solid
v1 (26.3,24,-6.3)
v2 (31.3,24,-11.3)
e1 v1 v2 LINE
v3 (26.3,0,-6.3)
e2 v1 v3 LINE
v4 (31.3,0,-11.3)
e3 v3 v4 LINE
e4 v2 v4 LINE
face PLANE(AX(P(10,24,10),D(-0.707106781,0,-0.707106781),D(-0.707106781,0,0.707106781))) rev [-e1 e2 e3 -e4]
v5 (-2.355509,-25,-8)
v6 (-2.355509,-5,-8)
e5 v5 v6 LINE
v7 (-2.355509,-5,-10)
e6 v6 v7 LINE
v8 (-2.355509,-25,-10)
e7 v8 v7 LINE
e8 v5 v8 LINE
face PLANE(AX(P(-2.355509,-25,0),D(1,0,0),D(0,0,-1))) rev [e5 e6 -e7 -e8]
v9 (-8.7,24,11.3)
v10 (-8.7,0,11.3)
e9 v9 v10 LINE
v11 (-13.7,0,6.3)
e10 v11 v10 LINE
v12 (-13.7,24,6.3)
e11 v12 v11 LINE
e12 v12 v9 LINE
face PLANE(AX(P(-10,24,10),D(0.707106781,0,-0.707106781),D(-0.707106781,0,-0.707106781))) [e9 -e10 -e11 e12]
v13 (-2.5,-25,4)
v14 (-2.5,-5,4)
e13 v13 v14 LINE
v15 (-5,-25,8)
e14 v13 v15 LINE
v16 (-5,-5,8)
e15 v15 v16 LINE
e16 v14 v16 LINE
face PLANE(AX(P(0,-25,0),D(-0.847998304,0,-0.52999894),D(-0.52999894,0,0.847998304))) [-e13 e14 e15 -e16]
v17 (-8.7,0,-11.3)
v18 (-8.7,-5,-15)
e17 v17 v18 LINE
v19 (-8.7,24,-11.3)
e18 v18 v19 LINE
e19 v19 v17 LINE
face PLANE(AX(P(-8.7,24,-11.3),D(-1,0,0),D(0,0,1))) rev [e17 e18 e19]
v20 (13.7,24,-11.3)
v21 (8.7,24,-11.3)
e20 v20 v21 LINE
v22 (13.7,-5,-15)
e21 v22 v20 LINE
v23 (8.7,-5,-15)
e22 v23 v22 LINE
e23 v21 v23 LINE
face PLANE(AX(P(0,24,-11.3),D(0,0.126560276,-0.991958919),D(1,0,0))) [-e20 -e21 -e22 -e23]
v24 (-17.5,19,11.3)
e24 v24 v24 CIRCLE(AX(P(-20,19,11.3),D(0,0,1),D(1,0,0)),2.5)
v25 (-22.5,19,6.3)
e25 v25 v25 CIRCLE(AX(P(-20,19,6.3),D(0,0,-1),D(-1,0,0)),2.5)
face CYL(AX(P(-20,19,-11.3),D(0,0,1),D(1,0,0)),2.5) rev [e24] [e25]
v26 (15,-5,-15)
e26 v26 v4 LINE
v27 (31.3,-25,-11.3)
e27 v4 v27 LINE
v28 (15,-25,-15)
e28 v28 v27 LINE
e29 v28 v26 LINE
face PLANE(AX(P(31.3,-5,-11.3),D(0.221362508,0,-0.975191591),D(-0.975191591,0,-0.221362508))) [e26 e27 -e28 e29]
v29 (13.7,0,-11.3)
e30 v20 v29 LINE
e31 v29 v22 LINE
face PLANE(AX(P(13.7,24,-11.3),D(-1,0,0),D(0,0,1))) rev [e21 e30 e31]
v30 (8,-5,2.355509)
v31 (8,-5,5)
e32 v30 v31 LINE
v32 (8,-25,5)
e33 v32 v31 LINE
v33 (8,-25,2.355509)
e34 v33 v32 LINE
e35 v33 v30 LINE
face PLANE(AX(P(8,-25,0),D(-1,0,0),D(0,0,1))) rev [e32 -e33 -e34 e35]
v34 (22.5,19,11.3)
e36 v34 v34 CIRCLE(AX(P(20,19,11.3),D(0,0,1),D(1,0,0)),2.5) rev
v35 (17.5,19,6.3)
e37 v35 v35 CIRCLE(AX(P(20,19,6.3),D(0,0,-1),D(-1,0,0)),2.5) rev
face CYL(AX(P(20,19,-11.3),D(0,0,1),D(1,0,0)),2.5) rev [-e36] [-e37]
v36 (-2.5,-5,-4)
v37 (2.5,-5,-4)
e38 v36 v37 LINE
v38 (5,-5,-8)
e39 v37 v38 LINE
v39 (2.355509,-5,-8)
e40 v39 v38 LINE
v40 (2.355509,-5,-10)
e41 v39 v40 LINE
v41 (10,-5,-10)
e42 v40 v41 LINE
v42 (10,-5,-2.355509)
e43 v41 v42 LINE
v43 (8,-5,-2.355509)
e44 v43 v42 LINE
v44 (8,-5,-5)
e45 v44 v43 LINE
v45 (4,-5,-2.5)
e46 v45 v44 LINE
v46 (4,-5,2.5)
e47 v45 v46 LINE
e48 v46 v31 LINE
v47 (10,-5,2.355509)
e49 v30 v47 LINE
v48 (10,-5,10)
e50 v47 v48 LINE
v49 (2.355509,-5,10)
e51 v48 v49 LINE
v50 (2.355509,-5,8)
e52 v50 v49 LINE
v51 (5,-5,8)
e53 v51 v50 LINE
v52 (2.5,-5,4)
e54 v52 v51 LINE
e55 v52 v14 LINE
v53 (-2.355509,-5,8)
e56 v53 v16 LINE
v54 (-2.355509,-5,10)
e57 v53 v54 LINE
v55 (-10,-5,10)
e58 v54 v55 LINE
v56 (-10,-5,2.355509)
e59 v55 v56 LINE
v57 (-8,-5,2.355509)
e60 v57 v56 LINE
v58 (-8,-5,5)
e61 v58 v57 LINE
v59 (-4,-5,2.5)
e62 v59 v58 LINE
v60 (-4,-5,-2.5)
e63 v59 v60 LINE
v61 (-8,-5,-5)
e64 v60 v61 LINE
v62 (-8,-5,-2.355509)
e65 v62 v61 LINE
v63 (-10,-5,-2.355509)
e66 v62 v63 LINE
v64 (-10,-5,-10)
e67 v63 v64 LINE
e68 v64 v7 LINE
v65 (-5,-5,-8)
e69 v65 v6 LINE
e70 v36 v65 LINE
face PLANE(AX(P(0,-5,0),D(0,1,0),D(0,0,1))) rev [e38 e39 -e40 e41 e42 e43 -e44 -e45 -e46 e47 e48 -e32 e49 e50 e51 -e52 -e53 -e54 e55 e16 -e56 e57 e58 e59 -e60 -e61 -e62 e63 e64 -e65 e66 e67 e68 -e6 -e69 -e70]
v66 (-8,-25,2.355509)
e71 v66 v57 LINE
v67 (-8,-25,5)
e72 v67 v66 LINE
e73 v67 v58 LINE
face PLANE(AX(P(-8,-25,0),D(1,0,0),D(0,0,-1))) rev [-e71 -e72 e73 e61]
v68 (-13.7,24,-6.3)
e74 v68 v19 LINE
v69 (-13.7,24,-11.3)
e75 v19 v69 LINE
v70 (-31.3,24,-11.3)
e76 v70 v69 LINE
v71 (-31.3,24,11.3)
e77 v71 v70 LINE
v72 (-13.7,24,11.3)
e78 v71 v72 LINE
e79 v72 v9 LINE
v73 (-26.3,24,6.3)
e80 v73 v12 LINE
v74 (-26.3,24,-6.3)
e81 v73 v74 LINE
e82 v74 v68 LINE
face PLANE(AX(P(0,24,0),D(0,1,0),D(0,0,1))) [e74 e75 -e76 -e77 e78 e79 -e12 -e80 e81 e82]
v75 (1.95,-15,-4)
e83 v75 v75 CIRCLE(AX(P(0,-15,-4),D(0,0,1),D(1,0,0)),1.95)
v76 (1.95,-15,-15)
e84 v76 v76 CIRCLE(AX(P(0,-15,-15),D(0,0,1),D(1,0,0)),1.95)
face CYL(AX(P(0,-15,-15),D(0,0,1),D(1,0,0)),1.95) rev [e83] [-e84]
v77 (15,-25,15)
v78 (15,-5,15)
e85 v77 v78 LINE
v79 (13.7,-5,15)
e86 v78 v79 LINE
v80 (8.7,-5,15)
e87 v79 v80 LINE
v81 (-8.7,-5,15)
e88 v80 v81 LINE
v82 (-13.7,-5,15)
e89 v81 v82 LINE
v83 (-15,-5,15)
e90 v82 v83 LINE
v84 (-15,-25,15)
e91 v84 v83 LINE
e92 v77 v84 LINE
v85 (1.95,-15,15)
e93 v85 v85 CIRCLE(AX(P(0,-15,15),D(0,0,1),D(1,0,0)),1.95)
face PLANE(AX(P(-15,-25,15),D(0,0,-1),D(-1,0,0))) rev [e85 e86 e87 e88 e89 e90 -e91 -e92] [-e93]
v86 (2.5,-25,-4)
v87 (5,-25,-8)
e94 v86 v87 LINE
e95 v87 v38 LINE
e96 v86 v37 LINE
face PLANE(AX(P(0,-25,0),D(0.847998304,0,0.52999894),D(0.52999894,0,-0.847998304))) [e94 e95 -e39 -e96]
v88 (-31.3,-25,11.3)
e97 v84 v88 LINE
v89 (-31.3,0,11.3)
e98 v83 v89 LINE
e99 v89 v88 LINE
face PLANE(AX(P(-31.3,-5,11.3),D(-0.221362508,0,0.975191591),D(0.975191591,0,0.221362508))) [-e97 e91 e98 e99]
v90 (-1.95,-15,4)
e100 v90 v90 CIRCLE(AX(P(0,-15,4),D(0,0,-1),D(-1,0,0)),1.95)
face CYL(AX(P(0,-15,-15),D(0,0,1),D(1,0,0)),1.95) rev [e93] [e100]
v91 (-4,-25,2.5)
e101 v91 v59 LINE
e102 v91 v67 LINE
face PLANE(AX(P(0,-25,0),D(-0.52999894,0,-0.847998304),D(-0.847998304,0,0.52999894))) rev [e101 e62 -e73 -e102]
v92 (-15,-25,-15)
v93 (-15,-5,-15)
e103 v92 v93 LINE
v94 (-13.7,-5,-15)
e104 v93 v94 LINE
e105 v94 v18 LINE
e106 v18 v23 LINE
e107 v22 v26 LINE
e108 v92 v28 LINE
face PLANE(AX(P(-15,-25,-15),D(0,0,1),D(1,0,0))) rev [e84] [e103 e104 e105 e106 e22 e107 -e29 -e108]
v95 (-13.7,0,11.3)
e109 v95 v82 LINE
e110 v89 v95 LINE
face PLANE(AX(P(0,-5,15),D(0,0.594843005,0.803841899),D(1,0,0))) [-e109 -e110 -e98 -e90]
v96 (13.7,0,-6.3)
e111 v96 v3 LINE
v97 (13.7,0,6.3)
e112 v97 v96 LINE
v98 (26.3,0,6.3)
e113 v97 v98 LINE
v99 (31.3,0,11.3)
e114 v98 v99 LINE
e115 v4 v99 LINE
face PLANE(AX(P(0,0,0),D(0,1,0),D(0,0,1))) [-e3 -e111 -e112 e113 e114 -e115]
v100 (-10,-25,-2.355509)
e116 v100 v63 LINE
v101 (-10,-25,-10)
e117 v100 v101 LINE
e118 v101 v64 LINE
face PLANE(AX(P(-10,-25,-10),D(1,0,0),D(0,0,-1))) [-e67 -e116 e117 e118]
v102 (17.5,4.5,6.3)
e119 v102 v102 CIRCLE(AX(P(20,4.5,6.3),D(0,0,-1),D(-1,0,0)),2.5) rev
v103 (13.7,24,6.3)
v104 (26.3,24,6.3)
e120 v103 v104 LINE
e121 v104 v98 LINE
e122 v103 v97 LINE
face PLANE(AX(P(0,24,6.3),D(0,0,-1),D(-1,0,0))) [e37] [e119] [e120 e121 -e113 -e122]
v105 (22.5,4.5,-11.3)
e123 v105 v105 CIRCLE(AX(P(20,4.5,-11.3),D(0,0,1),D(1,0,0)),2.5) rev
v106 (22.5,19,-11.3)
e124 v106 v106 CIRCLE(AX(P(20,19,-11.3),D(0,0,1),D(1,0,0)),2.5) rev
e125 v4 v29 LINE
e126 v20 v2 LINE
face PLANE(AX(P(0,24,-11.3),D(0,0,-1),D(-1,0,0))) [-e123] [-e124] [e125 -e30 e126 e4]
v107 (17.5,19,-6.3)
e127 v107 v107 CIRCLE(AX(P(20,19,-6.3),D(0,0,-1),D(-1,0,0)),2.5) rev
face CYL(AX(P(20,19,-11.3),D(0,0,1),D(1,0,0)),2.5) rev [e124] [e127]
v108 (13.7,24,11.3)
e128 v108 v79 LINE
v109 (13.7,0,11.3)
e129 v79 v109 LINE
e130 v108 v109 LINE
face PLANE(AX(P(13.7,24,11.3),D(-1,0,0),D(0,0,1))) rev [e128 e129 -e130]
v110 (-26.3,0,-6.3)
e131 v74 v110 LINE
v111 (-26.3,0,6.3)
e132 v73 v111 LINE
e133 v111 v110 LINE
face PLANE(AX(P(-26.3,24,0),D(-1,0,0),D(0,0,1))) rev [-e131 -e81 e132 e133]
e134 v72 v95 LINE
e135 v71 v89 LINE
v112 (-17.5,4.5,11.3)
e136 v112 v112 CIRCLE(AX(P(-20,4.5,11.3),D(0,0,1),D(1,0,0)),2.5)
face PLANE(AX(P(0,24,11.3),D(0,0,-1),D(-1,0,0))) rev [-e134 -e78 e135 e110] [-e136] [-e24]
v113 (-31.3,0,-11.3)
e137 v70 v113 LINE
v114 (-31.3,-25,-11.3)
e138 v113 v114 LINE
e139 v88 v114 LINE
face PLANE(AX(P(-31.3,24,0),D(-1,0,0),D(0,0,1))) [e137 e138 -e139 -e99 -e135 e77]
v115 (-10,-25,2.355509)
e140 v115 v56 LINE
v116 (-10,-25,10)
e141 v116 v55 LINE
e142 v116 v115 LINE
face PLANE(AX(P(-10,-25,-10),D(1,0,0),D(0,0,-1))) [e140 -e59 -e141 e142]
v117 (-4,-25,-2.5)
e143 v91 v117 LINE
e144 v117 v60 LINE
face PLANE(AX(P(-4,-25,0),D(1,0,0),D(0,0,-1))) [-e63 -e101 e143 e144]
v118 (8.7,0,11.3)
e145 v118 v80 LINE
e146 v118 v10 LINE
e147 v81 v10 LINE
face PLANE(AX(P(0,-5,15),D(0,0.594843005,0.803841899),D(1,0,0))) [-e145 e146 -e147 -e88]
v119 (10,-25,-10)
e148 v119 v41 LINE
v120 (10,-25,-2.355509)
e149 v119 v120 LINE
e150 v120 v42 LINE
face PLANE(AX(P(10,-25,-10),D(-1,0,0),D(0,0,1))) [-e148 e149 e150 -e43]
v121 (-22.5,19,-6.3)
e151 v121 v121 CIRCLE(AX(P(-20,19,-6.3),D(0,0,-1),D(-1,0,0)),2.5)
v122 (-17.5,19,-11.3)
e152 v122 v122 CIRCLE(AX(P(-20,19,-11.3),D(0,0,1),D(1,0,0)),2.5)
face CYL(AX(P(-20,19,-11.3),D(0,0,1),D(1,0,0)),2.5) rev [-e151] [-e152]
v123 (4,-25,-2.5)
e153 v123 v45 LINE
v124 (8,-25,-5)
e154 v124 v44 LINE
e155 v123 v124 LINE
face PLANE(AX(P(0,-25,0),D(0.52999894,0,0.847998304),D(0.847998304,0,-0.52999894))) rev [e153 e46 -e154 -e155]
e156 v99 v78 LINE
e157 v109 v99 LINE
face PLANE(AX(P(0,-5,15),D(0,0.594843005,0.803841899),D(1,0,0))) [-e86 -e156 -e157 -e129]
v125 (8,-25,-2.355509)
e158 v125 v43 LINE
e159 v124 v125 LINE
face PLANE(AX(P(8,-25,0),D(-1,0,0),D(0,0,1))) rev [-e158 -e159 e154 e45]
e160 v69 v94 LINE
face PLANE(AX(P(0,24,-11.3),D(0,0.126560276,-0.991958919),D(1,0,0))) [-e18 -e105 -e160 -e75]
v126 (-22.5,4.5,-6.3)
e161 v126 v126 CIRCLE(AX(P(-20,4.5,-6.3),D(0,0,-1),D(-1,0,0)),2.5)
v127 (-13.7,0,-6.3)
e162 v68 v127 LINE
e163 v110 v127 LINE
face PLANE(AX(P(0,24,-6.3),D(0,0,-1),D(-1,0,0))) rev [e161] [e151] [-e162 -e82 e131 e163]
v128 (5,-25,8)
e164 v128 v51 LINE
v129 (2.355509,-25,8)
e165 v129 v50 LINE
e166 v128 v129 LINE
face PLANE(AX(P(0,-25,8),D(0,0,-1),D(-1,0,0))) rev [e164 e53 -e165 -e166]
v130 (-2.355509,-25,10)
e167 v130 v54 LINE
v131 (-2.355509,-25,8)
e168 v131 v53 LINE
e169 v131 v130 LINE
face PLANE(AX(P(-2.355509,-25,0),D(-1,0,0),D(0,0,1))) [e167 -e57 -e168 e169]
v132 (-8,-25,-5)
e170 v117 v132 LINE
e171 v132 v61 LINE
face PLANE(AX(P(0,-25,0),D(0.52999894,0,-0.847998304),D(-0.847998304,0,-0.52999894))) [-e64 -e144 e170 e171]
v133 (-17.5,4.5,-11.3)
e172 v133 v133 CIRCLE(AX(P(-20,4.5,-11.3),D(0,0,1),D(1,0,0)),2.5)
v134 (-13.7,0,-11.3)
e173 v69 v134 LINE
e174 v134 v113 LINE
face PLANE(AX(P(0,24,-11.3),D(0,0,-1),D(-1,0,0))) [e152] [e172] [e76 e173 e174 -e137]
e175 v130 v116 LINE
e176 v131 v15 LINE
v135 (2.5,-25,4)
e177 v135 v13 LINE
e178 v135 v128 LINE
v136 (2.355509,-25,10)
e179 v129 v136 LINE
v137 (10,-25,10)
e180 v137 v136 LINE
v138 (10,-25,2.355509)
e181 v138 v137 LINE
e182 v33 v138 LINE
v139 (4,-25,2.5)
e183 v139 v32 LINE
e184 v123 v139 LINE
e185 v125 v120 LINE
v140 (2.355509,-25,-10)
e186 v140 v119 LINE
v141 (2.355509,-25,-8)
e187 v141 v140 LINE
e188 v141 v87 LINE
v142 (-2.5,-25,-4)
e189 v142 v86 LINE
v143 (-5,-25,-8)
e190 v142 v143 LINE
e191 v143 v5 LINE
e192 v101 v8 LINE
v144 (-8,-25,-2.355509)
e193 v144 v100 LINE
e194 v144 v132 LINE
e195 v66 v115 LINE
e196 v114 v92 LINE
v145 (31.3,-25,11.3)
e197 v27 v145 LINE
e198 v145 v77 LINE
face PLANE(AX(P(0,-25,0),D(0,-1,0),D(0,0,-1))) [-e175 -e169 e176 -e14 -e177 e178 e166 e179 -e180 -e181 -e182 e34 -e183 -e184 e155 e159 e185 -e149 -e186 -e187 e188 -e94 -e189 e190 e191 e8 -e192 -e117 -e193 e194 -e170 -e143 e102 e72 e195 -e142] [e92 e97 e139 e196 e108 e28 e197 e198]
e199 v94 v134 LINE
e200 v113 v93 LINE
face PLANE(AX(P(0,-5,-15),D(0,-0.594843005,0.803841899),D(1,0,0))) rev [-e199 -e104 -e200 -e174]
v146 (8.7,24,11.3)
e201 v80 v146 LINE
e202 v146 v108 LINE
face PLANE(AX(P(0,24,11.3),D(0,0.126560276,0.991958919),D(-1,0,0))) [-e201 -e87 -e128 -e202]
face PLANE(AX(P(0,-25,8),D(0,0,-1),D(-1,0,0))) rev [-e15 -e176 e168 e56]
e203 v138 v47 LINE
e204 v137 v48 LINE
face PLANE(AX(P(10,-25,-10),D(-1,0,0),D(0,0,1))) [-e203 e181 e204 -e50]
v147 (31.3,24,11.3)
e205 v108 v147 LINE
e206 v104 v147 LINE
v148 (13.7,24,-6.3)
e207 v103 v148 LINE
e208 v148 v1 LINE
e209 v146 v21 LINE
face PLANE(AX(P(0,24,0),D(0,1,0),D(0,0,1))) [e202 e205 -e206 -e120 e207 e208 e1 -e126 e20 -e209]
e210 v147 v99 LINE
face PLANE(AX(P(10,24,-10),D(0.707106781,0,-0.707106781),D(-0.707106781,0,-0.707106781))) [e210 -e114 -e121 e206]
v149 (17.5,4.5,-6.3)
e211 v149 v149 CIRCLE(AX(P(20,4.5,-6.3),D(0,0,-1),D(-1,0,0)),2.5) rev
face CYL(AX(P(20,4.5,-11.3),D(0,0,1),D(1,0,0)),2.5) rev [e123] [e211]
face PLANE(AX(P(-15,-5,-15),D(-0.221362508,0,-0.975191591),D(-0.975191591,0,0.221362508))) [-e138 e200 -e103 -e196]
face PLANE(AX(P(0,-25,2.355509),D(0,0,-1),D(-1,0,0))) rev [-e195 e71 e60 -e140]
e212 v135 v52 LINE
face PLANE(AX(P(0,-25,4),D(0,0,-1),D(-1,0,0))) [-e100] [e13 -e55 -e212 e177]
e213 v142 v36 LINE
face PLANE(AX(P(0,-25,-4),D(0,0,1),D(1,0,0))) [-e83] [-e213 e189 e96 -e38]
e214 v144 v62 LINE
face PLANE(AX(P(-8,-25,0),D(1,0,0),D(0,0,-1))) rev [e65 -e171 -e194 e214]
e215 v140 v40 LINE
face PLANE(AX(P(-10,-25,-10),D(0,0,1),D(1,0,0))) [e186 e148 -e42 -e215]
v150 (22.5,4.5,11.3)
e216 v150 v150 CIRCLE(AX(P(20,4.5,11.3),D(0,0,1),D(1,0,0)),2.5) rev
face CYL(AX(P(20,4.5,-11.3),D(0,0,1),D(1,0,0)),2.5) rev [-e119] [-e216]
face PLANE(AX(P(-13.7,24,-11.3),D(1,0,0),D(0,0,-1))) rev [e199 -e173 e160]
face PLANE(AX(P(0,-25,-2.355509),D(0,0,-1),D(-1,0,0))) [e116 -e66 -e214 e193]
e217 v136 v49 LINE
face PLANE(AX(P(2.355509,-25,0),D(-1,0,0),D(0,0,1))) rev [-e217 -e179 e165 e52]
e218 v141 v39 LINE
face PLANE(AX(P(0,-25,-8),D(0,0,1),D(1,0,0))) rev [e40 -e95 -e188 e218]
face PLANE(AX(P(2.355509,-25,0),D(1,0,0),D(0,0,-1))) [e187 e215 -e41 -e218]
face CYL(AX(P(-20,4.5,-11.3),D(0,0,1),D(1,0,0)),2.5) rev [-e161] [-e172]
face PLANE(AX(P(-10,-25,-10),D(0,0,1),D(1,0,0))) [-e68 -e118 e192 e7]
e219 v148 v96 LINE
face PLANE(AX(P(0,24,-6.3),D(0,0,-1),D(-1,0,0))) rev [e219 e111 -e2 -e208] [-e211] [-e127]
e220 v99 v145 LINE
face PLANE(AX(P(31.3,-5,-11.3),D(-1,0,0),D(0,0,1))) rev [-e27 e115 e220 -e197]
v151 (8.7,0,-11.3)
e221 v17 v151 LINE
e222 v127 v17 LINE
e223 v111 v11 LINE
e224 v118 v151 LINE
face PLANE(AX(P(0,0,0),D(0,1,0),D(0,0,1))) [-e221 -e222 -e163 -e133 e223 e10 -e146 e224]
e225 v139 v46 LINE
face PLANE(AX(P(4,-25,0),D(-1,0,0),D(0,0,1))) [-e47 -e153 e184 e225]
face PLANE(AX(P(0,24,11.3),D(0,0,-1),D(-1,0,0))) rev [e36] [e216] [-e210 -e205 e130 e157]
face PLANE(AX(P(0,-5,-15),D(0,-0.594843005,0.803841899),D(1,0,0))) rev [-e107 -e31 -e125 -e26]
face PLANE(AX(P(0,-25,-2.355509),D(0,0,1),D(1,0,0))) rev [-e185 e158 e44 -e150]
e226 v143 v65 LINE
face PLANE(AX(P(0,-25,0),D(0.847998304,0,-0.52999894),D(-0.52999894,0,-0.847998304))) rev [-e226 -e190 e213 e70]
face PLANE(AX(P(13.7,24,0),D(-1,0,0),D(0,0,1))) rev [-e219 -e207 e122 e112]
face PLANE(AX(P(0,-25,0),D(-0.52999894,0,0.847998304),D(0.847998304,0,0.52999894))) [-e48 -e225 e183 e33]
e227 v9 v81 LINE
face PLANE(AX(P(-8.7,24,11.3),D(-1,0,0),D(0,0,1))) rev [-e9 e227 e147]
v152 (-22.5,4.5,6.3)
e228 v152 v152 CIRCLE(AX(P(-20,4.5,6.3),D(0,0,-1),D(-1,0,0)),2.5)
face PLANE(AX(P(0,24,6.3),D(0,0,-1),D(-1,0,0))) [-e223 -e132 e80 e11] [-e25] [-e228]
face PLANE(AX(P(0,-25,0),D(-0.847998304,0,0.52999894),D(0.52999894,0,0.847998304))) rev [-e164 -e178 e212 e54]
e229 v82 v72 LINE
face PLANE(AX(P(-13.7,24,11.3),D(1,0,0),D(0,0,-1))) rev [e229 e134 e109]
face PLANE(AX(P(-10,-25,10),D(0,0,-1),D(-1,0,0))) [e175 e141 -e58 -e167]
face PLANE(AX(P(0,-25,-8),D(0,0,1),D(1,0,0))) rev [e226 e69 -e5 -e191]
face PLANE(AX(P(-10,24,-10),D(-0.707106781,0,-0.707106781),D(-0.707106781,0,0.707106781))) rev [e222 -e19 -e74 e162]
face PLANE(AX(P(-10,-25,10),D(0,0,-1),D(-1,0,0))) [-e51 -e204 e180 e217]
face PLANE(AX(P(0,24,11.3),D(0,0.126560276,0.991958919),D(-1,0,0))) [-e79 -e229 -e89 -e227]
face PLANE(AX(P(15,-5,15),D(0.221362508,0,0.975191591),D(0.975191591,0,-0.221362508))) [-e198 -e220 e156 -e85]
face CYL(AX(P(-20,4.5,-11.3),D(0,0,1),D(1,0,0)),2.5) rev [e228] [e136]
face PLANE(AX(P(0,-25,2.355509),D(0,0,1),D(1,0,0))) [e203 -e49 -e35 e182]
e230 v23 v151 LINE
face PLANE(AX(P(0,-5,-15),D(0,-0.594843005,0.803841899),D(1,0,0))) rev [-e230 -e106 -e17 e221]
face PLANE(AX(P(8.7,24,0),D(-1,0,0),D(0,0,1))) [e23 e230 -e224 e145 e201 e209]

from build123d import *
from OCP.BRepFilletAPI import BRepFilletAPI_MakeChamfer

# Parameters (mm, degrees)
BOSS_EXTRUDE1_DEPTH     = 24
SKETCH2_R               = 2.5
CUT_EXTRUDE1_DEPTH      = 46.458222579
SKETCH3_W               = 62.6
SKETCH3_H               = 22.6
BOSS_EXTRUDE2_DEPTH     = 5
SKETCH4_W               = 30
SKETCH4_H               = 30
SKETCH4_W_2             = 20
SKETCH4_H_2             = 20
BOSS_EXTRUDE3_DEPTH     = 20
SKETCH6_W               = 20
SKETCH6_H               = 20
BOSS_EXTRUDE4_DEPTH     = 20
SKETCH8_W               = 2
SKETCH8_H               = 4.711017494
SKETCH8_W_2             = 4.711017494
SKETCH8_H_2             = 2
BOSS_EXTRUDE5_DEPTH     = 20
SKETCH9_W               = 5
SKETCH9_H               = 3.7
BOSS_EXTRUDE6_DEPTH     = 29
CHAMFER1_SIZE           = 29
CHAMFER1_SIZE2          = 3.7
CHAMFER3_SIZE           = 3.7
CHAMFER3_SIZE_2         = 5
CHAMFER4_SIZE           = 5
CHAMFER4_SIZE_2         = 3.7
CHAMFER5_SIZE2          = 3.7
CHAMFER5_SIZE           = 5
CUT_EXTRUDE2_DEPTH      = 45.33610267
CUT_EXTRUDE2_DEPTH_BACK = 45.33610267
SKETCH11_R              = 1.95


# Some blends are built 0.0001 mm under size
with BuildPart() as part:
    # Sketch1 → Boss-Extrude1 (new body)
    with BuildSketch(Plane(origin=(0, 0, 0), x_dir=(1, 0, 0), z_dir=(0, 1, 0))):
        Polygon((-13.7, -6.3), (-8.7, -11.3), (-31.3, -11.3), (-31.3, 11.3), (-8.7, 11.3), (-13.7, 6.3), (-26.3, 6.3), (-26.3, -6.3), align=None)
        Polygon((8.7, 11.3), (8.7, 0), (13.7, 0), (13.7, 6.3), (26.3, 6.3), (31.3, 11.3), align=None)
        Polygon((13.7, 0), (8.7, 0), (8.7, -11.3), (31.3, -11.3), (26.3, -6.3), (13.7, -6.3), align=None)
    extrude(amount=BOSS_EXTRUDE1_DEPTH)

    # Sketch2 → Cut-Extrude1 (cut, through all)
    with BuildSketch(Plane.XY.offset(11.3)):
        with Locations((-20, 19)):
            Circle(SKETCH2_R)
        with Locations((-20, 4.5)):
            Circle(SKETCH2_R)
        with Locations((20, 4.5)):
            Circle(SKETCH2_R)
        with Locations((20, 19)):
            Circle(SKETCH2_R)
    extrude(amount=-CUT_EXTRUDE1_DEPTH, mode=Mode.SUBTRACT)

    # Sketch3 → Boss-Extrude2 (add)
    with BuildSketch(Plane.XZ):
        Rectangle(SKETCH3_W, SKETCH3_H)
    extrude(amount=BOSS_EXTRUDE2_DEPTH)

    # Sketch4 → Boss-Extrude3 (add)
    with BuildSketch(Plane.XZ.offset(5)):
        Rectangle(SKETCH4_W, SKETCH4_H)
        Rectangle(SKETCH4_W_2, SKETCH4_H_2, mode=Mode.SUBTRACT)
    extrude(amount=BOSS_EXTRUDE3_DEPTH)

    # Sketch6 → Boss-Extrude4 (add)
    with BuildSketch(Plane.XZ.offset(25)):
        Polygon((15, 15), (31.3, 11.3), (31.3, -11.3), (15, -15), (-15, -15), (-31.3, -11.3), (-31.3, 11.3), (-15, 15), align=None)
        Rectangle(SKETCH6_W, SKETCH6_H, mode=Mode.SUBTRACT)
    extrude(amount=-BOSS_EXTRUDE4_DEPTH)

    # Sketch8 → Boss-Extrude5 (add)
    with BuildSketch(Plane.XZ.offset(5)):
        Polygon((4, 2.5), (4, -2.5), (8, -5), (8, -2.355508747), (8, 2.355508747), (8, 5), align=None)
        with Locations((9, 0)):
            Rectangle(SKETCH8_W, SKETCH8_H)
        with Locations((0, 9)):
            Rectangle(SKETCH8_W_2, SKETCH8_H_2)
        Polygon((5, 8), (2.355508747, 8), (-2.355508747, 8), (-5, 8), (-2.5, 4), (2.5, 4), align=None)
        with Locations((-9, 0)):
            Rectangle(SKETCH8_W, SKETCH8_H)
        Polygon((-8, 2.355508747), (-8, -2.355508747), (-8, -5), (-4, -2.5), (-4, 2.5), (-8, 5), align=None)
        with Locations((0, -9)):
            Rectangle(SKETCH8_W_2, SKETCH8_H_2)
        Polygon((-2.355508747, -8), (2.355508747, -8), (5, -8), (2.5, -4), (-2.5, -4), (-5, -8), align=None)
    extrude(amount=BOSS_EXTRUDE5_DEPTH)

    # Sketch9 → Boss-Extrude6 (add)
    with BuildSketch(Plane(origin=(0, -5, 0), x_dir=(1, 0, 0), z_dir=(0, 1, 0))):
        with Locations((11.2, 13.15)):
            Rectangle(SKETCH9_W, SKETCH9_H)
        with Locations((11.2, -13.15)):
            Rectangle(SKETCH9_W, SKETCH9_H)
        with Locations((-11.2, 13.15)):
            Rectangle(SKETCH9_W, SKETCH9_H)
        with Locations((-11.2, -13.15)):
            Rectangle(SKETCH9_W, SKETCH9_H)
    extrude(amount=BOSS_EXTRUDE6_DEPTH)

    # Chamfer1: one chamfer whose edges measure the first distance from different faces: ONE call of the kernel's chamfer builder (chamfer() names one face for all edges)
    chamfer1_edges_1 = [part.edges().sort_by_distance(p)[0] for p in [
        (11.2, 24, -15),
        (-11.2, 24, -15),
    ]]
    chamfer1_side_1 = [part.faces().sort_by_distance(p)[0] for p in [
        (0, -7.016853933, -15),
    ]]
    chamfer1_edges_2 = [part.edges().sort_by_distance(p)[0] for p in [
        (-11.2, 24, 15),
        (11.2, 24, 15),
    ]]
    chamfer1_side_2 = [part.faces().sort_by_distance(p)[0] for p in [
        (0, -7.016853933, 15),
    ]]
    chamfer1 = BRepFilletAPI_MakeChamfer(part.part.solid().wrapped)
    for e in chamfer1_edges_1:
        chamfer1.Add(CHAMFER1_SIZE, CHAMFER1_SIZE2, e.wrapped, chamfer1_side_1[0].wrapped)  # the first distance lies on this face
    for e in chamfer1_edges_2:
        chamfer1.Add(CHAMFER1_SIZE, CHAMFER1_SIZE2, e.wrapped, chamfer1_side_2[0].wrapped)  # the first distance lies on this face
    add(Compound.cast(chamfer1.Shape()), mode=Mode.REPLACE)

    # Chamfer3
    # the kernel refuses this chamfer: 5, 3.7 mm, written as the material it adds along each edge
    with BuildSketch(Plane(origin=(21.605348649, -5, -11.3), x_dir=(0, -0.04206007695140814, -0.9991150834247482), z_dir=(-1, 0, 0))) as chamfer3_piece_1_section:
        Polygon((CHAMFER3_SIZE * 0.999115083425, -CHAMFER3_SIZE * 0.0420600769514), (-CHAMFER3_SIZE_2 * 0.0420600769514, -CHAMFER3_SIZE_2 * 0.999115083425), (0, 0), align=None)
    chamfer3_piece_1 = extrude(amount=43.210697297, mode=Mode.PRIVATE)
    chamfer3_piece_1 = split(chamfer3_piece_1, bisect_by=Plane(origin=(13.7, -3.301546392, -12.48628866), z_dir=(-1, 0, 0)), keep=Keep.TOP, mode=Mode.PRIVATE)
    chamfer3_piece_1 = split(chamfer3_piece_1, bisect_by=Plane(origin=(-13.7, -3.301546392, -12.48628866), z_dir=(1, 0, 0)), keep=Keep.TOP, mode=Mode.PRIVATE)
    add(chamfer3_piece_1)

    # Chamfer4
    chamfer4_edges_1 = [part.edges().sort_by_distance(p)[0] for p in [
        (22.5, -5, 11.3),
    ]]
    chamfer4_side_1 = [part.faces().sort_by_distance(p)[0] for p in [
        (22.5, -4.926, 11.3),
    ]]
    chamfer4_edges_2 = [part.edges().sort_by_distance(p)[0] for p in [
        (-22.5, -5, 11.3),
    ]]
    chamfer4_side_2 = [part.faces().sort_by_distance(p)[0] for p in [
        (-22.5, -4.926, 11.3),
    ]]
    chamfer4_edges_3 = [part.edges().sort_by_distance(p)[0] for p in [
        (22.5, -5, -11.3),
    ]]
    chamfer4_side_3 = [part.faces().sort_by_distance(p)[0] for p in [
        (22.5, -5, -11.374),
    ]]
    chamfer4_edges_4 = [part.edges().sort_by_distance(p)[0] for p in [
        (-22.5, -5, -11.3),
    ]]
    chamfer4_side_4 = [part.faces().sort_by_distance(p)[0] for p in [
        (-22.5, -5, -11.374),
    ]]
    chamfer4 = BRepFilletAPI_MakeChamfer(part.part.solid().wrapped)
    for e in chamfer4_edges_1:
        chamfer4.Add(CHAMFER4_SIZE - 0.0001, CHAMFER4_SIZE_2 - 0.0001, e.wrapped, chamfer4_side_1[0].wrapped)
    for e in chamfer4_edges_2:
        chamfer4.Add(CHAMFER4_SIZE - 0.0001, CHAMFER4_SIZE_2 - 0.0001, e.wrapped, chamfer4_side_2[0].wrapped)
    for e in chamfer4_edges_3:
        chamfer4.Add(CHAMFER4_SIZE_2 - 0.0001, CHAMFER4_SIZE - 0.0001, e.wrapped, chamfer4_side_3[0].wrapped)
    for e in chamfer4_edges_4:
        chamfer4.Add(CHAMFER4_SIZE_2 - 0.0001, CHAMFER4_SIZE - 0.0001, e.wrapped, chamfer4_side_4[0].wrapped)
    add(Compound.cast(chamfer4.Shape()), mode=Mode.REPLACE)  # a hair under: the kernel refuses the full size

    # Chamfer5
    chamfer5_edges = [part.edges().sort_by_distance(p)[0] for p in [
        (0, -5, 11.3),
    ]]
    chamfer5_side = [part.faces().sort_by_distance(p)[0] for p in [
        (0, -4.926, 11.3),
    ]]
    chamfer(chamfer5_edges, length=CHAMFER5_SIZE - 0.0001, length2=CHAMFER5_SIZE2 - 0.0001, reference=chamfer5_side[0])  # a hair under: the kernel refuses the full size

    # Sketch11 → Cut-Extrude2 (cut, two sides: drawn at the far end of the back side and taken through both)
    with BuildSketch(Plane.XY.offset(-4).offset(-CUT_EXTRUDE2_DEPTH_BACK)):
        with Locations((0, -15)):
            Circle(SKETCH11_R)
    extrude(amount=CUT_EXTRUDE2_DEPTH + CUT_EXTRUDE2_DEPTH_BACK, mode=Mode.SUBTRACT)


solid = part.part
